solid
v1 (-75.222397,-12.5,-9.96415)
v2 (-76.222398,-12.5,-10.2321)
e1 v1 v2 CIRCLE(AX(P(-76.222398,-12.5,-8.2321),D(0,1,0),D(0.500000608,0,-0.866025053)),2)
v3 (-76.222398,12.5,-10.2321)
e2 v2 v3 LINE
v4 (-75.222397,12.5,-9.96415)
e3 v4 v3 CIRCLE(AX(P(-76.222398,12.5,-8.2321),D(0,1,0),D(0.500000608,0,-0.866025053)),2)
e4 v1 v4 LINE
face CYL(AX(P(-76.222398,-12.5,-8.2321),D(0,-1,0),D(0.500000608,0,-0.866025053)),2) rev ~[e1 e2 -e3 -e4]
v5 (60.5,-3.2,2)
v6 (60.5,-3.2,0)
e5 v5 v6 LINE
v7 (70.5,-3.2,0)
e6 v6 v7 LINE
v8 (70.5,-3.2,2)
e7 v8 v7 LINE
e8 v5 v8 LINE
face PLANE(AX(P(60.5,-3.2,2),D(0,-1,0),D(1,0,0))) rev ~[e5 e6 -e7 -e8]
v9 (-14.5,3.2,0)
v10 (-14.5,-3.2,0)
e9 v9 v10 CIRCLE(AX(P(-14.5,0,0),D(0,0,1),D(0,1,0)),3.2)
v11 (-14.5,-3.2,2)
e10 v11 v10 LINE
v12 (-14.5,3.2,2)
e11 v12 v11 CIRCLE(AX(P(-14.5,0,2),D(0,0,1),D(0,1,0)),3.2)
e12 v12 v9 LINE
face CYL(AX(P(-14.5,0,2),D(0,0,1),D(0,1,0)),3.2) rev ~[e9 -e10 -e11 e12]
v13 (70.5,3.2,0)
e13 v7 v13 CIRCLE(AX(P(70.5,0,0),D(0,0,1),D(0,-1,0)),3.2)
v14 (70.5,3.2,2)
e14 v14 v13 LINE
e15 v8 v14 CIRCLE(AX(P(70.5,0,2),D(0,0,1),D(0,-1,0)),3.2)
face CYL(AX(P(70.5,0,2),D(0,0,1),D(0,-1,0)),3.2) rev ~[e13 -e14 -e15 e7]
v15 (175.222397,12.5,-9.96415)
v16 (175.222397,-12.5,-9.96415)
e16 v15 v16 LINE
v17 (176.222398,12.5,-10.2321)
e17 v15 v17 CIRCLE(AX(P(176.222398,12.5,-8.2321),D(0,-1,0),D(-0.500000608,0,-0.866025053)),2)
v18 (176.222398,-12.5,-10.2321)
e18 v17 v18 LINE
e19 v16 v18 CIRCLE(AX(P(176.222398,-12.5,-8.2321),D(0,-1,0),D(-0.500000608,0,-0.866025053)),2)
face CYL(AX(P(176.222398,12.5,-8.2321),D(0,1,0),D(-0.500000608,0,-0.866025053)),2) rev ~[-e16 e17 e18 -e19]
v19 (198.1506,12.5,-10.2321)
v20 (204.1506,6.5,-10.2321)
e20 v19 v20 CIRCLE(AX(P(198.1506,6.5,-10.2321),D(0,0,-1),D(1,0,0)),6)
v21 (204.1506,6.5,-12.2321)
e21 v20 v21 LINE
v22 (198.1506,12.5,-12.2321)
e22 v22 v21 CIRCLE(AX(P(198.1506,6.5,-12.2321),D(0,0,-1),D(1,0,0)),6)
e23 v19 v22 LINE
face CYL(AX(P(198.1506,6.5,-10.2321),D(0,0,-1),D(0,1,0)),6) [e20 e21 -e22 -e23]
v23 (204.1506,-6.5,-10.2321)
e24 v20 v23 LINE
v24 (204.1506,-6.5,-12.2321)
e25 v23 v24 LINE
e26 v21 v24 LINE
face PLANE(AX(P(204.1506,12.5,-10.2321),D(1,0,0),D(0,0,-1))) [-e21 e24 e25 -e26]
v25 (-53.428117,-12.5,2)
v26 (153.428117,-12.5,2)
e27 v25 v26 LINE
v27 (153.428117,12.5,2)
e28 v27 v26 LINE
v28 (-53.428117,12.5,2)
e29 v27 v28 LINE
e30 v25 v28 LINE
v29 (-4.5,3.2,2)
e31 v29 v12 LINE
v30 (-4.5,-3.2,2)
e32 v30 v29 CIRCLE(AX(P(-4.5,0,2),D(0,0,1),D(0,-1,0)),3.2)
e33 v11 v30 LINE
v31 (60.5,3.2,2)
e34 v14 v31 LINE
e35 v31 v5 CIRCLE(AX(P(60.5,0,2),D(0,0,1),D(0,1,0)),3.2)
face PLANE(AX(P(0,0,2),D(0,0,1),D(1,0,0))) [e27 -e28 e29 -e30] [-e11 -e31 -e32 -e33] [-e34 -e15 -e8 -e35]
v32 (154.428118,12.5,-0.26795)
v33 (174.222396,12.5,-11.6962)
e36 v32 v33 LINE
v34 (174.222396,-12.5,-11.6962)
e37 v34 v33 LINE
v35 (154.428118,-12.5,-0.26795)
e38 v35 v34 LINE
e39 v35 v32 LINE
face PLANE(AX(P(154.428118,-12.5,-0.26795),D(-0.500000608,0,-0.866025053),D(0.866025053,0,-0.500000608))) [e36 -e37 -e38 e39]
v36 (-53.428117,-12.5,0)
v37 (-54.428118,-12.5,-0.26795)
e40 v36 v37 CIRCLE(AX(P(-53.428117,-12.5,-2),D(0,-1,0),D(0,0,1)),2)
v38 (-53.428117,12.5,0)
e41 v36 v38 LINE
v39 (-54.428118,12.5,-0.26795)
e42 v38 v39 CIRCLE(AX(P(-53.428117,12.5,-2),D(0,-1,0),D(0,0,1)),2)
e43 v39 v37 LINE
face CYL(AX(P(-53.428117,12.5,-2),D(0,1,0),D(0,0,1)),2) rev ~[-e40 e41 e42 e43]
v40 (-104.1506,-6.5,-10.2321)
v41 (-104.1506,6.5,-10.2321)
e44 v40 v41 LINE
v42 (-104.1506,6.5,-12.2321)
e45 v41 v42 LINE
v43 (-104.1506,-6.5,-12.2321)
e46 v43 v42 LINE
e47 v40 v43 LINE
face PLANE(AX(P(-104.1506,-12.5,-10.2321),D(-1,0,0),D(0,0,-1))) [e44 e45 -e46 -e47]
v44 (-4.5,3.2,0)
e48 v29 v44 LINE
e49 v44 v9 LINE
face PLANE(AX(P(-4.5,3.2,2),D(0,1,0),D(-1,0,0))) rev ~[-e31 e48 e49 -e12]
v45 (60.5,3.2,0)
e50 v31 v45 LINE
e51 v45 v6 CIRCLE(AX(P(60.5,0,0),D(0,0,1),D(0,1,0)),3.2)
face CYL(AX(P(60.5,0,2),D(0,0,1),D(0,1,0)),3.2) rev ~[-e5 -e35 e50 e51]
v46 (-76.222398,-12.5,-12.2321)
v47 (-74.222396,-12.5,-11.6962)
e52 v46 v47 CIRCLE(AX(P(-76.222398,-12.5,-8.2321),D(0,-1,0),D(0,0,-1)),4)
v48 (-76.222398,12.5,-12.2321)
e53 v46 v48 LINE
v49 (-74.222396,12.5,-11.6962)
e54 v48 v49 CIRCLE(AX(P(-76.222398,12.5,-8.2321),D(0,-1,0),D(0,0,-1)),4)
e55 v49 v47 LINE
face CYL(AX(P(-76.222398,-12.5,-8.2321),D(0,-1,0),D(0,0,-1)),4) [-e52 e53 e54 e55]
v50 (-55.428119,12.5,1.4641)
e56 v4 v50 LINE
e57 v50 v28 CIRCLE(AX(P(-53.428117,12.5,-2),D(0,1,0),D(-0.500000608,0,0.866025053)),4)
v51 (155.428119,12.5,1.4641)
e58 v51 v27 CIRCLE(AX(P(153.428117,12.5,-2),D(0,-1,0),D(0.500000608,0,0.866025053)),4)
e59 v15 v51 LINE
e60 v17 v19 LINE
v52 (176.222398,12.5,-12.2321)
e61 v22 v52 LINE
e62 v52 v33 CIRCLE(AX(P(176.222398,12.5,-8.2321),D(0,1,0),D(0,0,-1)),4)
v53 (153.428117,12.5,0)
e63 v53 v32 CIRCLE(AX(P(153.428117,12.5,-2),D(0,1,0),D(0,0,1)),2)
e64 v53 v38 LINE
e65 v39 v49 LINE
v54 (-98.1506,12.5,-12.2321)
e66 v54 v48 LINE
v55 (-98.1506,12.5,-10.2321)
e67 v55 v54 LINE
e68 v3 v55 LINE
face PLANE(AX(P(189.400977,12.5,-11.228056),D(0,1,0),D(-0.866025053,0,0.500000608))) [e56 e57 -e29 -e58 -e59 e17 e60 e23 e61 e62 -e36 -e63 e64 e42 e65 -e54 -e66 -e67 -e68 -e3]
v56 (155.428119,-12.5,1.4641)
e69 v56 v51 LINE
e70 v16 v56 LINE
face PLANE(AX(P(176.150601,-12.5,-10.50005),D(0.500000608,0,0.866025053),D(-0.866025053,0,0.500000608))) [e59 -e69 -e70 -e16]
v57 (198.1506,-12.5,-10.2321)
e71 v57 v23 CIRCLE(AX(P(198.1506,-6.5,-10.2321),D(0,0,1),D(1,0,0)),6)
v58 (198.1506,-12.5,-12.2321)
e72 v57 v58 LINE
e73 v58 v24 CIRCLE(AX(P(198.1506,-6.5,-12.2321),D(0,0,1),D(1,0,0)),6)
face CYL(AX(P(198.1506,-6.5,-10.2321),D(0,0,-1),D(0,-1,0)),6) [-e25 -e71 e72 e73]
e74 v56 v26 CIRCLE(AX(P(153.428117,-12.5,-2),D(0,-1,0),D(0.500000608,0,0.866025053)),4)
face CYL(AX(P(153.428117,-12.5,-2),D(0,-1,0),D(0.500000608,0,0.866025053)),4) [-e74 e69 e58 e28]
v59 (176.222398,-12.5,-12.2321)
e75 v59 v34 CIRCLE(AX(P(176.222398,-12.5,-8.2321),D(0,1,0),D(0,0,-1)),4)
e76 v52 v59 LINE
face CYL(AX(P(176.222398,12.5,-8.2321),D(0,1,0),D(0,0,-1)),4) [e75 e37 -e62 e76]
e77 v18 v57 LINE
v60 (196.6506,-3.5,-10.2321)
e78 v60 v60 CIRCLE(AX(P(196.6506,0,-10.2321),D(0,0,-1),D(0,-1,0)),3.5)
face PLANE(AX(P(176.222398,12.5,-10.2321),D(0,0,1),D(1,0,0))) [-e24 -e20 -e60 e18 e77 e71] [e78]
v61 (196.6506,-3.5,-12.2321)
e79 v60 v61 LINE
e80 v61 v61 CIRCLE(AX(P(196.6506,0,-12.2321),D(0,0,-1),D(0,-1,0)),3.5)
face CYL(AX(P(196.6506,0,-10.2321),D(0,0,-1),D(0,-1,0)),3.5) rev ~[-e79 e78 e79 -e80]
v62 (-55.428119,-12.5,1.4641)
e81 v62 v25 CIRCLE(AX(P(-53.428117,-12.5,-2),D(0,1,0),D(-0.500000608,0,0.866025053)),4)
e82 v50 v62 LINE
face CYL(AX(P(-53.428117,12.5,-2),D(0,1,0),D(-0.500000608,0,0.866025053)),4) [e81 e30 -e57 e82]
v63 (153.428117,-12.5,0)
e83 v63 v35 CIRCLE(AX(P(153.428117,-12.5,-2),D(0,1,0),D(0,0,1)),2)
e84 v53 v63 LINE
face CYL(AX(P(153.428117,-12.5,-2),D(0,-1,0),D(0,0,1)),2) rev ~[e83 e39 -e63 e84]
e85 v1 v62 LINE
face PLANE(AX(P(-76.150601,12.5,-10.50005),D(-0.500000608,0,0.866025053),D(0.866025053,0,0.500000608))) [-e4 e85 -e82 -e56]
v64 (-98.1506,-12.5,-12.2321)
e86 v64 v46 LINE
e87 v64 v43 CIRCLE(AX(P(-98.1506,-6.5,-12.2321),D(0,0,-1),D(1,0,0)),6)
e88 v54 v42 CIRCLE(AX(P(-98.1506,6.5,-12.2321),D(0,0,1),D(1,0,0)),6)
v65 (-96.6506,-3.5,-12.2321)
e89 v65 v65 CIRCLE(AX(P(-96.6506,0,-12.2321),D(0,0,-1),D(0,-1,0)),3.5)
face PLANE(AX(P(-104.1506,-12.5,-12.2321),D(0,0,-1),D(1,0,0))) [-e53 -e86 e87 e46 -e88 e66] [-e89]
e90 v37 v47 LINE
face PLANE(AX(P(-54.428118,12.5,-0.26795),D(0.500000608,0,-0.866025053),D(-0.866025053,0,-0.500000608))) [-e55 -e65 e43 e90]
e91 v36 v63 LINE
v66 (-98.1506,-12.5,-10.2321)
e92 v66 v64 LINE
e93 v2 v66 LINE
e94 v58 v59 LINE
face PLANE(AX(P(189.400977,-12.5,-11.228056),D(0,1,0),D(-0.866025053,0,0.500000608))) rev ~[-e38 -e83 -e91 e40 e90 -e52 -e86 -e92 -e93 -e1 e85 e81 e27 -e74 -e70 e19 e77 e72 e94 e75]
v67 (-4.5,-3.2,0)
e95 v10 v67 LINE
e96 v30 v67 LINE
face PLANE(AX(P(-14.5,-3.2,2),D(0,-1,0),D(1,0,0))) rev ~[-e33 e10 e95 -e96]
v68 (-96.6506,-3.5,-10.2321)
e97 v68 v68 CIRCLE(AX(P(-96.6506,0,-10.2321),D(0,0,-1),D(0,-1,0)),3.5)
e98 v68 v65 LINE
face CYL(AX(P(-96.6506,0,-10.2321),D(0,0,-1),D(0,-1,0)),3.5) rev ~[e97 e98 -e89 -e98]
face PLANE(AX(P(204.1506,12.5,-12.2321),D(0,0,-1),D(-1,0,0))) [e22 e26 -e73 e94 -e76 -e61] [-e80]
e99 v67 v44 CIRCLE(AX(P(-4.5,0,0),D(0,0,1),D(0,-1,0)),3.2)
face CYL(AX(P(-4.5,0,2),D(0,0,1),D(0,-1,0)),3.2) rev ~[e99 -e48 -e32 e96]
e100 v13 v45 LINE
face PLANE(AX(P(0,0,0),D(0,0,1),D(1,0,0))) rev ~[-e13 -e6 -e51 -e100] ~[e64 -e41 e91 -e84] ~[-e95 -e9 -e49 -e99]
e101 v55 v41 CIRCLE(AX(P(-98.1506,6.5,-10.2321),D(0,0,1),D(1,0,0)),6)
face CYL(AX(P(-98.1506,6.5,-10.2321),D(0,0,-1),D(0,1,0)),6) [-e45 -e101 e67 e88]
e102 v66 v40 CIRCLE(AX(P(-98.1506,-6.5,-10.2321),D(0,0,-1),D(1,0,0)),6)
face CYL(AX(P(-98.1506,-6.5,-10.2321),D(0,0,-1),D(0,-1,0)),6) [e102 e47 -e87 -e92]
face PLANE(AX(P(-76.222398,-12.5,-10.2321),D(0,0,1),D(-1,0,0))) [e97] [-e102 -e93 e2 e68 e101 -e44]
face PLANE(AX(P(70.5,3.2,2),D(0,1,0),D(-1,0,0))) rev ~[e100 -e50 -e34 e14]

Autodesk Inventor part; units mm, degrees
ref_plane "YZ Plane" through (0, 0, 0) normal (1, 0, 0) x (0, 1, 0)
ref_plane "XZ Plane" through (0, 0, 0) normal (0, 1, 0) x (-1, 0, 0)
ref_plane "XY Plane" through (0, 0, 0) normal (0, 0, 1) x (1, 0, 0)
sketch "Sketch1" plane through (0, 0, 0) normal (0, 0, 1) x (1, 0, 0)
  line L0 (-54.5, -12.5) -> (154.5, -12.5)
  line L1 (154.5, -12.5) -> (154.5, 12.5)
  line L2 (154.5, 12.5) -> (-54.5, 12.5)
  line L3 (-54.5, 12.5) -> (-54.5, -12.5)
  line L4 (-54.5, -12.5) -> (154.5, 12.5) construction
  line L5 (154.5, -12.5) -> (-54.5, 12.5) construction
  line L6 (149.5, 192.0914) -> (-150.5, 192.0914)
  line L7 (205, 191) -> (-105, 191)
  point P0 (50, 0)
  point P1 (50, 0)
  point P2 (50, 0)
  point P3 (50, 191)
  dimension "d0" = 25
  dimension "d1" = 209
extrude "Plate1" add sketch "Sketch1" along normal blind 2
sketch "Sketch2" plane through (153.5, -12.5, 0.2679) normal (0.5, 0, 0.8660254) x (0, 1, 0)
  line L0 (25, 0) -> (0, 0)
  line L1 (0, 0) -> (0, -25)
  line L2 (0, -25) -> (25, -25)
  line L3 (25, -25) -> (25, 0)
edge flange "Flange1" height 25 angle 30 thickness 2 bend radius 2 thickness toward (0.5, 0, 0.8660254) relief tear relief width 2 relief depth 1 corner gap 2 corner form 0 edges at (154.5, 0, 0) (-54.5, 0, 0) wall of the first edge with corners at (153.5, 12.5, 0.2679) (153.5, -12.5, 0.2679) (175.1506, -12.5, -12.2321) (175.1506, 12.5, -12.2321)
bend "Bend1"
corner "Corner1"
sketch "Sketch3" plane through (175.1506, 12.5, -10.2321) normal (0, 0, -1) x (-1, 0, 0)
  line L0 (0, -25) -> (0, 0)
  line L1 (0, 0) -> (-29, 0)
  line L2 (-29, 0) -> (-29, -25)
  line L3 (-29, -25) -> (0, -25)
edge flange "Flange2" height 29 angle 30 thickness 2 bend radius 2 thickness toward (0, 0, -1) relief tear relief width 2 relief depth 1 corner gap 2 corner form 0 edges at (176.1506, 0, -10.5) (-76.1506, 0, -10.5) wall of the first edge with corners at (175.1506, -12.5, -10.2321) (175.1506, 12.5, -10.2321) (204.1506, 12.5, -10.2321) (204.1506, -12.5, -10.2321)
bend "Bend2"
corner "Corner2"
sketch "Sketch4" plane through (0, 0, 2) normal (0, 0, 1) x (1, 0, 0)
  line L0 (-14.5, 0) -> (-4.5, 0) construction
  line L1 (-14.5, -3.2) -> (-4.5, -3.2)
  line L2 (-4.5, 3.2) -> (-14.5, 3.2)
  arc A0 (-14.5, 3.2) -> (-14.5, -3.2) centre (-14.5, 0) ccw
  arc A1 (-4.5, -3.2) -> (-4.5, 3.2) centre (-4.5, 0) ccw
  line L3 (60.5, 0) -> (70.5, 0) construction
  line L4 (60.5, -3.2) -> (70.5, -3.2)
  line L5 (70.5, 3.2) -> (60.5, 3.2)
  arc A2 (60.5, 3.2) -> (60.5, -3.2) centre (60.5, 0) ccw
  arc A3 (70.5, -3.2) -> (70.5, 3.2) centre (70.5, 0) ccw
  circle A4 centre (-9.5, 0) radius 3 projected
  circle A5 centre (65.5, 0) radius 2.3866 projected
  point P0 (0, 0)
  point P1 (-9.5, 0)
  point P2 (65.5, 0)
  dimension "d23" = 3.2
  dimension "d24" = 3.2
  dimension "d25" = 10
  dimension "d26" = 10
extrude "Cut1" cut sketch "Sketch4" against normal blind 2 contours A0 L2 A1 L1 | A2 L5 A3 L4 | A4 | A5
sketch "Sketch5" plane through (-104.1506, -12.5, -10.2321) normal (0, 0, 1) x (1, 0, 0)
  line L0 (0, 25) -> (0, 0) projected
  line L1 (308.3013, 0) -> (308.3013, 25) projected
  circle A0 centre (300.8013, 12.5) radius 2.75 projected
  circle A1 centre (7.5, 12.5) radius 2.75 projected
  point P0 (104.1506, 12.5)
  point P1 (300.8013, 12.5)
  point P2 (0, 12.5)
  point P3 (308.3013, 12.5)
hole "Hole1" at (-96.6506, 0, -10.2321) at (196.6506, 0, -10.2321) direction (0, 0, -1) diameter 7 depth 2 tip angle 118
fillet "Corner Round1" radius 6 4 edges at (-104.1506, 12.5, -11.2321) (-104.1506, -12.5, -11.2321) (204.1506, 12.5, -11.2321) (204.1506, -12.5, -11.2321)
equation "\"d27\" = Thickness"
equation "\"d36\" = Thickness"
equation "\"d3\" = BendReliefWidth"
equation "\"d4\" = BendReliefDepth"
equation "\"d5\" = MinimumRemnant"
equation "\"d6\" = BendRadius"
equation "\"d9\" = BendRadius"
equation "\"d10\" = CornerReliefSize"
equation "\"d11\" = GapSize"
equation "\"d12\" = JacobiRadiusSize"
equation "\"d13\" = BendReliefWidth"
equation "\"d14\" = BendReliefDepth"
equation "\"d15\" = MinimumRemnant"
equation "\"d16\" = BendRadius"
equation "\"d19\" = BendRadius"
equation "\"d20\" = CornerReliefSize"
equation "\"d21\" = GapSize"
equation "\"d22\" = JacobiRadiusSize"
equation "\"BendRadius\" = Thickness"
equation "\"BendReliefWidth\" = Thickness"
equation "\"BendReliefDepth\" = 0.5 * Thickness"
equation "\"CornerReliefSize\" = 4 * Thickness"
equation "\"MinimumRemnant\" = 2 * Thickness"
equation "\"TransitionRadius\" = BendRadius"
equation "\"JacobiRadiusSize\" = BendRadius"
equation "\"GapSize\" = Thickness"
equation "\"d2\" = BendRadius"
equation "\"Thickness\" = 2"
